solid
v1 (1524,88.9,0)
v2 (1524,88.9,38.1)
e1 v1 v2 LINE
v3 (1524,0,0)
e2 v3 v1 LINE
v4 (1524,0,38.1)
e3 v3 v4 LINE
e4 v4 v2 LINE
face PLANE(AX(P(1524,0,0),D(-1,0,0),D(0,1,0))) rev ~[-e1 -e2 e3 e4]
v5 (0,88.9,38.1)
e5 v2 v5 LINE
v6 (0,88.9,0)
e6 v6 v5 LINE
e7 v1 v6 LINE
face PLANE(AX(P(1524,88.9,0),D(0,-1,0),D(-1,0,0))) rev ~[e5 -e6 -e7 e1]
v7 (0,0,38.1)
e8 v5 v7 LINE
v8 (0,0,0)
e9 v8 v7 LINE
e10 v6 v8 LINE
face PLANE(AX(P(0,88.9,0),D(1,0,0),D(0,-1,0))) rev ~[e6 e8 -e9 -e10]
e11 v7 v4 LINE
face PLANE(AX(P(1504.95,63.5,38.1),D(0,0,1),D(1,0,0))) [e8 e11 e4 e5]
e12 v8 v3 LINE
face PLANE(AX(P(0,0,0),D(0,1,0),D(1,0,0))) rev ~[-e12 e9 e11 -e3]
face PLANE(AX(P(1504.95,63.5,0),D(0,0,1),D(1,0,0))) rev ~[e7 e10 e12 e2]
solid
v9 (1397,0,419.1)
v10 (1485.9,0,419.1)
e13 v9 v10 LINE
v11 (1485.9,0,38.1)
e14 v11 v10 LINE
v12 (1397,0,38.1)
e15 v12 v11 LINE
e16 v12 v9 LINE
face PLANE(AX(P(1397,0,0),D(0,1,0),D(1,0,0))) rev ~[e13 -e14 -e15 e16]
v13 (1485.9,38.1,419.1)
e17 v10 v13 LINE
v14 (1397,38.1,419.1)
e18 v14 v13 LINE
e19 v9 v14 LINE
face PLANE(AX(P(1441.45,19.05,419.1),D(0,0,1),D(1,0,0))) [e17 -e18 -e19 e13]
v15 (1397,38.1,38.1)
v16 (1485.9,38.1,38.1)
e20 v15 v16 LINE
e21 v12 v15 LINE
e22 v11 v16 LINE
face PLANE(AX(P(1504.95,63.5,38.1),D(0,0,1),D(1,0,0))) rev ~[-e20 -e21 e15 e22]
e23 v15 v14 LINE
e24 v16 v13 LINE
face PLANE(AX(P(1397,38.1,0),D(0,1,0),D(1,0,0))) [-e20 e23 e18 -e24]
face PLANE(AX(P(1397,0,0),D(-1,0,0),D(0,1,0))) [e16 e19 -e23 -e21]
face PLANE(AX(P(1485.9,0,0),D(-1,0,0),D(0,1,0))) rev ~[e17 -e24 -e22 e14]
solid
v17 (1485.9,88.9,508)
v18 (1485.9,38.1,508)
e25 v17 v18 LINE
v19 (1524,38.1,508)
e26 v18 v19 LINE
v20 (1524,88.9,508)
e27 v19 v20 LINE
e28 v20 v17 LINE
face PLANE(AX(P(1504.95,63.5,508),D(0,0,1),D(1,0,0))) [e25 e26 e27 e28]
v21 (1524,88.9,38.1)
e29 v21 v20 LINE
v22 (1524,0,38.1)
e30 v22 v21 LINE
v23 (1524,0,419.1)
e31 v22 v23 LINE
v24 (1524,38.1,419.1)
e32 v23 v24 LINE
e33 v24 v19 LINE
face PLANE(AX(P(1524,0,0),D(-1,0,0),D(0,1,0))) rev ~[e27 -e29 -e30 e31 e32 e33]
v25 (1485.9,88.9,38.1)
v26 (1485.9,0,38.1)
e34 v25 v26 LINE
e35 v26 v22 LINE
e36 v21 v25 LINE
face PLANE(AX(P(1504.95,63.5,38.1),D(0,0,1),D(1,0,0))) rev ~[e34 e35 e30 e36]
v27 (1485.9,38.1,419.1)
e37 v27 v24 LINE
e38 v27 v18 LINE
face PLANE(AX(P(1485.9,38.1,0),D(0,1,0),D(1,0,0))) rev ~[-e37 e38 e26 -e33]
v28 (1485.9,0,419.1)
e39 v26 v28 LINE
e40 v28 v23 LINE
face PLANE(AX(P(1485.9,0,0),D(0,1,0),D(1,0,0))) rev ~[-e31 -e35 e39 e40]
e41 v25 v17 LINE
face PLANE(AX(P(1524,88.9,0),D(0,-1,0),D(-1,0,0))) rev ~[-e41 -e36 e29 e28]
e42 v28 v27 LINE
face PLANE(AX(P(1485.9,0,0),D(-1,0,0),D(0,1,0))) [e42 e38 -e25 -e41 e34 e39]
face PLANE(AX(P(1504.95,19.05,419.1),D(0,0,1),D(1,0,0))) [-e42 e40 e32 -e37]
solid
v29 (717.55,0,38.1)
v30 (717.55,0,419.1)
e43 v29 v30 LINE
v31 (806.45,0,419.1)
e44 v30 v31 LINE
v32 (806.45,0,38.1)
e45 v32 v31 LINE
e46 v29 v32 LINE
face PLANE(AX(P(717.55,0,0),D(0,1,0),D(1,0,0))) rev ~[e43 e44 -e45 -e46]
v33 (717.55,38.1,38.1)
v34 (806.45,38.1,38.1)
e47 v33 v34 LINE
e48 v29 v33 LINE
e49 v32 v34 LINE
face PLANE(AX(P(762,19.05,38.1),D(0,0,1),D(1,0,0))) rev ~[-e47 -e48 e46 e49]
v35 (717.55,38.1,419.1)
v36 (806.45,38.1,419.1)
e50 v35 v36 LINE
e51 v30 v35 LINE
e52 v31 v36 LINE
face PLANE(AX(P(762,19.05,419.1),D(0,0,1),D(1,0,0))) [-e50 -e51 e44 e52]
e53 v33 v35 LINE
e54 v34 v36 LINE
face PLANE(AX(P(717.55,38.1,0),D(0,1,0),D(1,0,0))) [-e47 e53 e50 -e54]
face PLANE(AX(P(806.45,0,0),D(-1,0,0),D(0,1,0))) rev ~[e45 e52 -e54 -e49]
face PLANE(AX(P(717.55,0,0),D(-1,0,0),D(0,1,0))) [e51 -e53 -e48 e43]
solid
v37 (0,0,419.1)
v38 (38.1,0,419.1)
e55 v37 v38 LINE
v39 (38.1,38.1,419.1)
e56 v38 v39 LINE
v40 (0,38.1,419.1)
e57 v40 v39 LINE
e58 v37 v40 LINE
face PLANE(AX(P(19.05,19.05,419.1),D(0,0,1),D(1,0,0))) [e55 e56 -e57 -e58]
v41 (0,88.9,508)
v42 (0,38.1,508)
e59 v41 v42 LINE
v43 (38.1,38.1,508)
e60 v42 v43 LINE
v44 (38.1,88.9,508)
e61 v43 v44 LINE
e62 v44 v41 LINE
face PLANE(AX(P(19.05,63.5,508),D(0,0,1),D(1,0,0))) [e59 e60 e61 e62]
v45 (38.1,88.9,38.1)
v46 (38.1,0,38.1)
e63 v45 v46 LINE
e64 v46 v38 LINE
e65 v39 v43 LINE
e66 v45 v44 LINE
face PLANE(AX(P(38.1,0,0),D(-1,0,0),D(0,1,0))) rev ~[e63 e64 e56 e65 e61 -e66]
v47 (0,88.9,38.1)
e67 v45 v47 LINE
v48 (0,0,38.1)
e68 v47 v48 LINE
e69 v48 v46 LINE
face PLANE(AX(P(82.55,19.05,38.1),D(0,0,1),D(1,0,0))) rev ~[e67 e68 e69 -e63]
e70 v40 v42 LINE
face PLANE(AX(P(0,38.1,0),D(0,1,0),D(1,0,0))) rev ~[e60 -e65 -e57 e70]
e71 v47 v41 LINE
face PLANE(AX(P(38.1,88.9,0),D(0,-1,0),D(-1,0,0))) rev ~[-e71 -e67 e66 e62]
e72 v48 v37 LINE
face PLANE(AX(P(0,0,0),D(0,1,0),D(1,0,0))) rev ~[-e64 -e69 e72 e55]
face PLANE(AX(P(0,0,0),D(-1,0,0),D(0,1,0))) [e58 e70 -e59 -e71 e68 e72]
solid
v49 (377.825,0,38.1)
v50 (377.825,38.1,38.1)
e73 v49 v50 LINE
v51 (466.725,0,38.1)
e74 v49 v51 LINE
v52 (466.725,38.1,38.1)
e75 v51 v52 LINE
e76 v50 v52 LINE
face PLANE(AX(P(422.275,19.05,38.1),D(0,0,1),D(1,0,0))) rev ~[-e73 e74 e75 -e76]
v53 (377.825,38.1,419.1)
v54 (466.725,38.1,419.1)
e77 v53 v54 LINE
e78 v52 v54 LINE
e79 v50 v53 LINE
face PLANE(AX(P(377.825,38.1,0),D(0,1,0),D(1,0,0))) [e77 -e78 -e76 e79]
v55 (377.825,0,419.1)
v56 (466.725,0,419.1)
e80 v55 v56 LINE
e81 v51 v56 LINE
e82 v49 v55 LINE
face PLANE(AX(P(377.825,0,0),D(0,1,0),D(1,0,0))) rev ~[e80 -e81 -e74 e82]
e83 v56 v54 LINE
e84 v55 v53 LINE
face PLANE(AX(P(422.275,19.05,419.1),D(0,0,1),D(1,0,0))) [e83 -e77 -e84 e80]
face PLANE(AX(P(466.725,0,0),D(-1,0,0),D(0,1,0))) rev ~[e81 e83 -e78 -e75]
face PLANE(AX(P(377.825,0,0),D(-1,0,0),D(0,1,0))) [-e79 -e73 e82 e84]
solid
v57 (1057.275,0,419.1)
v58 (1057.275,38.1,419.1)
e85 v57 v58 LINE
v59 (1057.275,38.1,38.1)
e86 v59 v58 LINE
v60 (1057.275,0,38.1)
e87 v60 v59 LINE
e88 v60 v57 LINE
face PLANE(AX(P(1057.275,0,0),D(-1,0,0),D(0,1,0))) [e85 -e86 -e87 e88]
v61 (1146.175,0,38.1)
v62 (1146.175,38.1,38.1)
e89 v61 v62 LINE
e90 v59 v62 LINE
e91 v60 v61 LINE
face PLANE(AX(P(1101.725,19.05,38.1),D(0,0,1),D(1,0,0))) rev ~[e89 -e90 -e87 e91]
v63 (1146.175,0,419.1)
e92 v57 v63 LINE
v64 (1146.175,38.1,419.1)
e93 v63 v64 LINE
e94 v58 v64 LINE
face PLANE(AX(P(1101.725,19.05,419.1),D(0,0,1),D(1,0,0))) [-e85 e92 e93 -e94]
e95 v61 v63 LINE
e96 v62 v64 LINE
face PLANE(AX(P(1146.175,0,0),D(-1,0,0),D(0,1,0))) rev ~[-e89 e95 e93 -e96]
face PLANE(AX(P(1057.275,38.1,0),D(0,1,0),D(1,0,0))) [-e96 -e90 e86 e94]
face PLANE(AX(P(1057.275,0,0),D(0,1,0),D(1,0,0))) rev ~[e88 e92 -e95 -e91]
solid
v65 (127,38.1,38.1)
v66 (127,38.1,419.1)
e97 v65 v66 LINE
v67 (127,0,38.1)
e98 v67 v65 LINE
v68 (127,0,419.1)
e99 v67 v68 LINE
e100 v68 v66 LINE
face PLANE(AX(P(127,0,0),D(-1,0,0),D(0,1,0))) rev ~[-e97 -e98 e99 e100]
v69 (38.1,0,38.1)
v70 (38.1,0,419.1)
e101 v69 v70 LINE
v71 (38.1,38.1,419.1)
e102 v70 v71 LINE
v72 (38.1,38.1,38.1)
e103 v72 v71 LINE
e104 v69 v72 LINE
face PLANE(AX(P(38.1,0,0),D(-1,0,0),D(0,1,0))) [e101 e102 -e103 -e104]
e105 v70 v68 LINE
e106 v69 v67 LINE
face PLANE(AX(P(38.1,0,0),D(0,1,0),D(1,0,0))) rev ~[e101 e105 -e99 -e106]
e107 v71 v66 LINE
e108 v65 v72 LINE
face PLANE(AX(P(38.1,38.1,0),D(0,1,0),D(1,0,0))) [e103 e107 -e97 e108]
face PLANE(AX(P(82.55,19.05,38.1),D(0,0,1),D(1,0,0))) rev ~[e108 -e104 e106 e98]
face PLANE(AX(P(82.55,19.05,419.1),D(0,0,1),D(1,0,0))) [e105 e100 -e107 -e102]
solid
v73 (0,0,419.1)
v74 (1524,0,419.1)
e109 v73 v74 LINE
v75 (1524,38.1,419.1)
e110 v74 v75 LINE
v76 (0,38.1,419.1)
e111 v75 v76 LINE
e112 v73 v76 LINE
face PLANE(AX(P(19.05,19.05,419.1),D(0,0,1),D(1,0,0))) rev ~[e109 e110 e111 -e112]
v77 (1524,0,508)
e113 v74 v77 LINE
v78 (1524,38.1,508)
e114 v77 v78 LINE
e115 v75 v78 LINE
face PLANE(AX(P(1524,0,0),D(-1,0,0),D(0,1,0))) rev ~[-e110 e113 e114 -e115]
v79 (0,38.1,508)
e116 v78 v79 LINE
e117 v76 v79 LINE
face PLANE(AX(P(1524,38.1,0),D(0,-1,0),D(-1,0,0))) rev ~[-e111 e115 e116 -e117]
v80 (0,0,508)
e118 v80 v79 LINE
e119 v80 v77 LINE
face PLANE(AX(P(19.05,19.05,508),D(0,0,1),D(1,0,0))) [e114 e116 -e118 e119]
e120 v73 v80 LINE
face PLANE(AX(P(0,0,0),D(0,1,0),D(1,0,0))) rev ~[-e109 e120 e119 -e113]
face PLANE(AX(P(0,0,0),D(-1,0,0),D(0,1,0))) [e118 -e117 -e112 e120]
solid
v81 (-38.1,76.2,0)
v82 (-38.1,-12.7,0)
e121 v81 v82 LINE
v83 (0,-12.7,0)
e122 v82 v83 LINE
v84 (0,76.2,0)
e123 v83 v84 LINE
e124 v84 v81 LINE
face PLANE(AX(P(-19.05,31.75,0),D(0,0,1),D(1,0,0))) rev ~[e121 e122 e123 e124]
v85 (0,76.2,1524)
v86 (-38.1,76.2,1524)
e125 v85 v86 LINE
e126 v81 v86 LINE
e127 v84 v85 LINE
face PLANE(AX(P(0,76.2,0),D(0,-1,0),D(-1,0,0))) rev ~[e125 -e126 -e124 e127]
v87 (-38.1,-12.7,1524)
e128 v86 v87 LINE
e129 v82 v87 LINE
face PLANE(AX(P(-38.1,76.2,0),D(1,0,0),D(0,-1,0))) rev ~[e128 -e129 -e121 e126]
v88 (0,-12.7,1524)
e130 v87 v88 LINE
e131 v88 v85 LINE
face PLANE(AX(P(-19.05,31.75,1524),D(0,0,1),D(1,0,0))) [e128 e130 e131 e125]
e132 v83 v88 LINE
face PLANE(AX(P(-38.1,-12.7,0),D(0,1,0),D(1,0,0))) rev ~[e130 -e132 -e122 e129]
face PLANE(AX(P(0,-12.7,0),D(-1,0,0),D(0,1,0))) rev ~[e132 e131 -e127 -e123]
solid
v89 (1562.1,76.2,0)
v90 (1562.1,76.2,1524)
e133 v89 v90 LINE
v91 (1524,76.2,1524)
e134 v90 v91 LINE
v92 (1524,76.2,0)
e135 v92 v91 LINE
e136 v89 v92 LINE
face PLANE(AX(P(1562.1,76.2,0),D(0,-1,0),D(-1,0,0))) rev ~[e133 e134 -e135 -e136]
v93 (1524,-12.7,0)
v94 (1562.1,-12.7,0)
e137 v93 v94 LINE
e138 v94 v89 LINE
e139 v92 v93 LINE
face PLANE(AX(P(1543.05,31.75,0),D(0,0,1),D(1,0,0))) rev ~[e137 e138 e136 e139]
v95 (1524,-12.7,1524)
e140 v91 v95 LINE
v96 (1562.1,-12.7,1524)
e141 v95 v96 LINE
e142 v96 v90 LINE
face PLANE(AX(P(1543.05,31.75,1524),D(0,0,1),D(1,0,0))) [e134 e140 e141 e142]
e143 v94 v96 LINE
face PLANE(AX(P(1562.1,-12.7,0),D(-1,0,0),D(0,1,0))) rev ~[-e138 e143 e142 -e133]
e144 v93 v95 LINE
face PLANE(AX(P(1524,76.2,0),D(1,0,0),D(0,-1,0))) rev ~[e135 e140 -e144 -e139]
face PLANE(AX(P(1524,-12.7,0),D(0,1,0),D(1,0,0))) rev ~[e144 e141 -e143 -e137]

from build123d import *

# Parameters (mm, degrees)
F1_DEPTH = 1524
F0_W     = 38.1
F0_H     = 38.1
F0_W_2   = 88.9
F0_W_3   = 250.825
F2_DEPTH = 508
F3_DEPTH = 419.1
F4_DEPTH = 508
F5_DEPTH = 419.1
F6_DEPTH = 419.1
F7_DEPTH = 38.1
F8_DEPTH = 38.1


# Not quite as in the source:
# - a feature names something its author has since deleted; it is built from what else it names


with BuildPart() as f1:
    # F0 (on Top) → F1 (new body)
    with BuildSketch(Plane.XY):
        Polygon((0, -12.7), (0, 0), (0, 38.1), (0, 76.2), (-38.1, 76.2), (-38.1, -12.7), align=None)
    extrude(amount=F1_DEPTH)


with BuildPart() as f1b:
    # F0 (on Top) → F1, piece 2 (new body)
    with BuildSketch(Plane.XY):
        Polygon((1562.1, 76.2), (1524, 76.2), (1524, 38.1), (1524, 0), (1524, -12.7), (1562.1, -12.7), align=None)
    extrude(amount=F1_DEPTH)


with BuildPart() as f2:
    # F0 (on Top) → F2 (new body)
    with BuildSketch(Plane.XY):
        with Locations((19.05, 19.05)):
            Rectangle(F0_W, F0_H)
        with Locations((82.55, 19.05)):
            Rectangle(F0_W_2, F0_H)
        with Locations((252.4125, 19.05)):
            Rectangle(F0_W_3, F0_H)
        with Locations((422.275, 19.05)):
            Rectangle(F0_W_2, F0_H)
        with Locations((592.1375, 19.05)):
            Rectangle(F0_W_3, F0_H)
        with Locations((762, 19.05)):
            Rectangle(F0_W_2, F0_H)
        with Locations((931.8625, 19.05)):
            Rectangle(F0_W_3, F0_H)
        with Locations((1101.725, 19.05)):
            Rectangle(F0_W_2, F0_H)
        with Locations((1271.5875, 19.05)):
            Rectangle(F0_W_3, F0_H)
        with Locations((1441.45, 19.05)):
            Rectangle(F0_W_2, F0_H)
        with Locations((1504.95, 19.05)):
            Rectangle(F0_W, F0_H)
    extrude(amount=F2_DEPTH)

    # F0 (on Top) → F3 (cut)
    with BuildSketch(Plane.XY):
        with Locations((19.05, 19.05)):
            Rectangle(F0_W, F0_H)
        with Locations((82.55, 19.05)):
            Rectangle(F0_W_2, F0_H)
        with Locations((252.4125, 19.05)):
            Rectangle(F0_W_3, F0_H)
        with Locations((422.275, 19.05)):
            Rectangle(F0_W_2, F0_H)
        with Locations((592.1375, 19.05)):
            Rectangle(F0_W_3, F0_H)
        with Locations((762, 19.05)):
            Rectangle(F0_W_2, F0_H)
        with Locations((931.8625, 19.05)):
            Rectangle(F0_W_3, F0_H)
        with Locations((1101.725, 19.05)):
            Rectangle(F0_W_2, F0_H)
        with Locations((1271.5875, 19.05)):
            Rectangle(F0_W_3, F0_H)
        with Locations((1441.45, 19.05)):
            Rectangle(F0_W_2, F0_H)
        with Locations((1504.95, 19.05)):
            Rectangle(F0_W, F0_H)
    extrude(amount=F3_DEPTH, mode=Mode.SUBTRACT)


with BuildPart() as f4:
    # F0 (on Top) → F4 (new body, through all)
    with BuildSketch(Plane.XY):
        Polygon((0, 76.2), (0, 38.1), (38.1, 38.1), (38.1, 88.9), (0, 88.9), align=None)
    extrude(amount=F4_DEPTH)

    # F0 (on Top) → F5 (join, through all)
    with BuildSketch(Plane.XY):
        with Locations((19.05, 19.05)):
            Rectangle(F0_W, F0_H)
    extrude(amount=F5_DEPTH)


with BuildPart() as f4b:
    # F0 (on Top) → F4, piece 2 (new body, through all)
    with BuildSketch(Plane.XY):
        Polygon((1524, 88.9), (1485.9, 88.9), (1485.9, 38.1), (1524, 38.1), (1524, 76.2), align=None)
    extrude(amount=F4_DEPTH)

    # F0 (on Top) → F5, piece 2 (join, through all)
    with BuildSketch(Plane.XY):
        with Locations((1504.95, 19.05)):
            Rectangle(F0_W, F0_H)
    extrude(amount=F5_DEPTH)


with BuildPart() as f6:
    # F0 (on Top) → F6 (new body, through all)
    with BuildSketch(Plane.XY):
        with Locations((82.55, 19.05)):
            Rectangle(F0_W_2, F0_H)
    extrude(amount=F6_DEPTH)


with BuildPart() as f6b:
    # F0 (on Top) → F6, piece 2 (new body, through all)
    with BuildSketch(Plane.XY):
        with Locations((422.275, 19.05)):
            Rectangle(F0_W_2, F0_H)
    extrude(amount=F6_DEPTH)


with BuildPart() as f6c:
    # F0 (on Top) → F6, piece 3 (new body, through all)
    with BuildSketch(Plane.XY):
        with Locations((762, 19.05)):
            Rectangle(F0_W_2, F0_H)
    extrude(amount=F6_DEPTH)


with BuildPart() as f6d:
    # F0 (on Top) → F6, piece 4 (new body, through all)
    with BuildSketch(Plane.XY):
        with Locations((1101.725, 19.05)):
            Rectangle(F0_W_2, F0_H)
    extrude(amount=F6_DEPTH)


with BuildPart() as f6e:
    # F0 (on Top) → F6, piece 5 (new body, through all)
    with BuildSketch(Plane.XY):
        with Locations((1441.45, 19.05)):
            Rectangle(F0_W_2, F0_H)
    extrude(amount=F6_DEPTH)


with BuildPart() as f7_tool:
    # F0 (on Top) → F7 (new body)
    with BuildSketch(Plane.XY):
        Polygon((1524, 88.9), (1485.9, 88.9), (1485.9, 38.1), (1524, 38.1), (1524, 76.2), align=None)
        with Locations((1504.95, 19.05)):
            Rectangle(F0_W, F0_H)
        with Locations((1441.45, 19.05)):
            Rectangle(F0_W_2, F0_H)
        with Locations((1101.725, 19.05)):
            Rectangle(F0_W_2, F0_H)
        with Locations((762, 19.05)):
            Rectangle(F0_W_2, F0_H)
        with Locations((422.275, 19.05)):
            Rectangle(F0_W_2, F0_H)
        with Locations((82.55, 19.05)):
            Rectangle(F0_W_2, F0_H)
        with Locations((19.05, 19.05)):
            Rectangle(F0_W, F0_H)
        Polygon((0, 76.2), (0, 38.1), (38.1, 38.1), (38.1, 88.9), (0, 88.9), align=None)
    extrude(amount=F7_DEPTH)


with BuildPart() as f4_1:
    add(f4.part)

    # F7: cut by f7_tool
    add(f7_tool.part, mode=Mode.SUBTRACT)


with BuildPart() as f4b_1:
    add(f4b.part)

    # F7: cut by f7_tool
    add(f7_tool.part, mode=Mode.SUBTRACT)


with BuildPart() as f6_1:
    add(f6.part)

    # F7: cut by f7_tool
    add(f7_tool.part, mode=Mode.SUBTRACT)


with BuildPart() as f6b_1:
    add(f6b.part)

    # F7: cut by f7_tool
    add(f7_tool.part, mode=Mode.SUBTRACT)


with BuildPart() as f6c_1:
    add(f6c.part)

    # F7: cut by f7_tool
    add(f7_tool.part, mode=Mode.SUBTRACT)


with BuildPart() as f6d_1:
    add(f6d.part)

    # F7: cut by f7_tool
    add(f7_tool.part, mode=Mode.SUBTRACT)


with BuildPart() as f6e_1:
    add(f6e.part)

    # F7: cut by f7_tool
    add(f7_tool.part, mode=Mode.SUBTRACT)


with BuildPart() as f8:
    # F0 (on Top) → F8 (new body)
    with BuildSketch(Plane.XY):
        Polygon((1524, 88.9), (1485.9, 88.9), (1485.9, 38.1), (1524, 38.1), (1524, 76.2), align=None)
        with Locations((1504.95, 19.05)):
            Rectangle(F0_W, F0_H)
        with Locations((1441.45, 19.05)):
            Rectangle(F0_W_2, F0_H)
        Polygon((38.1, 88.9), (38.1, 38.1), (127, 38.1), (377.825, 38.1), (466.725, 38.1), (717.55, 38.1), (806.45, 38.1), (1057.275, 38.1), (1146.175, 38.1), (1397, 38.1), (1485.9, 38.1), (1485.9, 88.9), align=None)
        with Locations((1271.5875, 19.05)):
            Rectangle(F0_W_3, F0_H)
        with Locations((1101.725, 19.05)):
            Rectangle(F0_W_2, F0_H)
        with Locations((931.8625, 19.05)):
            Rectangle(F0_W_3, F0_H)
        with Locations((762, 19.05)):
            Rectangle(F0_W_2, F0_H)
        with Locations((592.1375, 19.05)):
            Rectangle(F0_W_3, F0_H)
        with Locations((422.275, 19.05)):
            Rectangle(F0_W_2, F0_H)
        with Locations((252.4125, 19.05)):
            Rectangle(F0_W_3, F0_H)
        with Locations((82.55, 19.05)):
            Rectangle(F0_W_2, F0_H)
        Polygon((0, 76.2), (0, 38.1), (38.1, 38.1), (38.1, 88.9), (0, 88.9), align=None)
        with Locations((19.05, 19.05)):
            Rectangle(F0_W, F0_H)
    extrude(amount=F8_DEPTH)


solid = Compound([f1.part, f1b.part, f2.part, f4_1.part, f4b_1.part, f6_1.part, f6b_1.part, f6c_1.part, f6d_1.part, f6e_1.part, f8.part])
